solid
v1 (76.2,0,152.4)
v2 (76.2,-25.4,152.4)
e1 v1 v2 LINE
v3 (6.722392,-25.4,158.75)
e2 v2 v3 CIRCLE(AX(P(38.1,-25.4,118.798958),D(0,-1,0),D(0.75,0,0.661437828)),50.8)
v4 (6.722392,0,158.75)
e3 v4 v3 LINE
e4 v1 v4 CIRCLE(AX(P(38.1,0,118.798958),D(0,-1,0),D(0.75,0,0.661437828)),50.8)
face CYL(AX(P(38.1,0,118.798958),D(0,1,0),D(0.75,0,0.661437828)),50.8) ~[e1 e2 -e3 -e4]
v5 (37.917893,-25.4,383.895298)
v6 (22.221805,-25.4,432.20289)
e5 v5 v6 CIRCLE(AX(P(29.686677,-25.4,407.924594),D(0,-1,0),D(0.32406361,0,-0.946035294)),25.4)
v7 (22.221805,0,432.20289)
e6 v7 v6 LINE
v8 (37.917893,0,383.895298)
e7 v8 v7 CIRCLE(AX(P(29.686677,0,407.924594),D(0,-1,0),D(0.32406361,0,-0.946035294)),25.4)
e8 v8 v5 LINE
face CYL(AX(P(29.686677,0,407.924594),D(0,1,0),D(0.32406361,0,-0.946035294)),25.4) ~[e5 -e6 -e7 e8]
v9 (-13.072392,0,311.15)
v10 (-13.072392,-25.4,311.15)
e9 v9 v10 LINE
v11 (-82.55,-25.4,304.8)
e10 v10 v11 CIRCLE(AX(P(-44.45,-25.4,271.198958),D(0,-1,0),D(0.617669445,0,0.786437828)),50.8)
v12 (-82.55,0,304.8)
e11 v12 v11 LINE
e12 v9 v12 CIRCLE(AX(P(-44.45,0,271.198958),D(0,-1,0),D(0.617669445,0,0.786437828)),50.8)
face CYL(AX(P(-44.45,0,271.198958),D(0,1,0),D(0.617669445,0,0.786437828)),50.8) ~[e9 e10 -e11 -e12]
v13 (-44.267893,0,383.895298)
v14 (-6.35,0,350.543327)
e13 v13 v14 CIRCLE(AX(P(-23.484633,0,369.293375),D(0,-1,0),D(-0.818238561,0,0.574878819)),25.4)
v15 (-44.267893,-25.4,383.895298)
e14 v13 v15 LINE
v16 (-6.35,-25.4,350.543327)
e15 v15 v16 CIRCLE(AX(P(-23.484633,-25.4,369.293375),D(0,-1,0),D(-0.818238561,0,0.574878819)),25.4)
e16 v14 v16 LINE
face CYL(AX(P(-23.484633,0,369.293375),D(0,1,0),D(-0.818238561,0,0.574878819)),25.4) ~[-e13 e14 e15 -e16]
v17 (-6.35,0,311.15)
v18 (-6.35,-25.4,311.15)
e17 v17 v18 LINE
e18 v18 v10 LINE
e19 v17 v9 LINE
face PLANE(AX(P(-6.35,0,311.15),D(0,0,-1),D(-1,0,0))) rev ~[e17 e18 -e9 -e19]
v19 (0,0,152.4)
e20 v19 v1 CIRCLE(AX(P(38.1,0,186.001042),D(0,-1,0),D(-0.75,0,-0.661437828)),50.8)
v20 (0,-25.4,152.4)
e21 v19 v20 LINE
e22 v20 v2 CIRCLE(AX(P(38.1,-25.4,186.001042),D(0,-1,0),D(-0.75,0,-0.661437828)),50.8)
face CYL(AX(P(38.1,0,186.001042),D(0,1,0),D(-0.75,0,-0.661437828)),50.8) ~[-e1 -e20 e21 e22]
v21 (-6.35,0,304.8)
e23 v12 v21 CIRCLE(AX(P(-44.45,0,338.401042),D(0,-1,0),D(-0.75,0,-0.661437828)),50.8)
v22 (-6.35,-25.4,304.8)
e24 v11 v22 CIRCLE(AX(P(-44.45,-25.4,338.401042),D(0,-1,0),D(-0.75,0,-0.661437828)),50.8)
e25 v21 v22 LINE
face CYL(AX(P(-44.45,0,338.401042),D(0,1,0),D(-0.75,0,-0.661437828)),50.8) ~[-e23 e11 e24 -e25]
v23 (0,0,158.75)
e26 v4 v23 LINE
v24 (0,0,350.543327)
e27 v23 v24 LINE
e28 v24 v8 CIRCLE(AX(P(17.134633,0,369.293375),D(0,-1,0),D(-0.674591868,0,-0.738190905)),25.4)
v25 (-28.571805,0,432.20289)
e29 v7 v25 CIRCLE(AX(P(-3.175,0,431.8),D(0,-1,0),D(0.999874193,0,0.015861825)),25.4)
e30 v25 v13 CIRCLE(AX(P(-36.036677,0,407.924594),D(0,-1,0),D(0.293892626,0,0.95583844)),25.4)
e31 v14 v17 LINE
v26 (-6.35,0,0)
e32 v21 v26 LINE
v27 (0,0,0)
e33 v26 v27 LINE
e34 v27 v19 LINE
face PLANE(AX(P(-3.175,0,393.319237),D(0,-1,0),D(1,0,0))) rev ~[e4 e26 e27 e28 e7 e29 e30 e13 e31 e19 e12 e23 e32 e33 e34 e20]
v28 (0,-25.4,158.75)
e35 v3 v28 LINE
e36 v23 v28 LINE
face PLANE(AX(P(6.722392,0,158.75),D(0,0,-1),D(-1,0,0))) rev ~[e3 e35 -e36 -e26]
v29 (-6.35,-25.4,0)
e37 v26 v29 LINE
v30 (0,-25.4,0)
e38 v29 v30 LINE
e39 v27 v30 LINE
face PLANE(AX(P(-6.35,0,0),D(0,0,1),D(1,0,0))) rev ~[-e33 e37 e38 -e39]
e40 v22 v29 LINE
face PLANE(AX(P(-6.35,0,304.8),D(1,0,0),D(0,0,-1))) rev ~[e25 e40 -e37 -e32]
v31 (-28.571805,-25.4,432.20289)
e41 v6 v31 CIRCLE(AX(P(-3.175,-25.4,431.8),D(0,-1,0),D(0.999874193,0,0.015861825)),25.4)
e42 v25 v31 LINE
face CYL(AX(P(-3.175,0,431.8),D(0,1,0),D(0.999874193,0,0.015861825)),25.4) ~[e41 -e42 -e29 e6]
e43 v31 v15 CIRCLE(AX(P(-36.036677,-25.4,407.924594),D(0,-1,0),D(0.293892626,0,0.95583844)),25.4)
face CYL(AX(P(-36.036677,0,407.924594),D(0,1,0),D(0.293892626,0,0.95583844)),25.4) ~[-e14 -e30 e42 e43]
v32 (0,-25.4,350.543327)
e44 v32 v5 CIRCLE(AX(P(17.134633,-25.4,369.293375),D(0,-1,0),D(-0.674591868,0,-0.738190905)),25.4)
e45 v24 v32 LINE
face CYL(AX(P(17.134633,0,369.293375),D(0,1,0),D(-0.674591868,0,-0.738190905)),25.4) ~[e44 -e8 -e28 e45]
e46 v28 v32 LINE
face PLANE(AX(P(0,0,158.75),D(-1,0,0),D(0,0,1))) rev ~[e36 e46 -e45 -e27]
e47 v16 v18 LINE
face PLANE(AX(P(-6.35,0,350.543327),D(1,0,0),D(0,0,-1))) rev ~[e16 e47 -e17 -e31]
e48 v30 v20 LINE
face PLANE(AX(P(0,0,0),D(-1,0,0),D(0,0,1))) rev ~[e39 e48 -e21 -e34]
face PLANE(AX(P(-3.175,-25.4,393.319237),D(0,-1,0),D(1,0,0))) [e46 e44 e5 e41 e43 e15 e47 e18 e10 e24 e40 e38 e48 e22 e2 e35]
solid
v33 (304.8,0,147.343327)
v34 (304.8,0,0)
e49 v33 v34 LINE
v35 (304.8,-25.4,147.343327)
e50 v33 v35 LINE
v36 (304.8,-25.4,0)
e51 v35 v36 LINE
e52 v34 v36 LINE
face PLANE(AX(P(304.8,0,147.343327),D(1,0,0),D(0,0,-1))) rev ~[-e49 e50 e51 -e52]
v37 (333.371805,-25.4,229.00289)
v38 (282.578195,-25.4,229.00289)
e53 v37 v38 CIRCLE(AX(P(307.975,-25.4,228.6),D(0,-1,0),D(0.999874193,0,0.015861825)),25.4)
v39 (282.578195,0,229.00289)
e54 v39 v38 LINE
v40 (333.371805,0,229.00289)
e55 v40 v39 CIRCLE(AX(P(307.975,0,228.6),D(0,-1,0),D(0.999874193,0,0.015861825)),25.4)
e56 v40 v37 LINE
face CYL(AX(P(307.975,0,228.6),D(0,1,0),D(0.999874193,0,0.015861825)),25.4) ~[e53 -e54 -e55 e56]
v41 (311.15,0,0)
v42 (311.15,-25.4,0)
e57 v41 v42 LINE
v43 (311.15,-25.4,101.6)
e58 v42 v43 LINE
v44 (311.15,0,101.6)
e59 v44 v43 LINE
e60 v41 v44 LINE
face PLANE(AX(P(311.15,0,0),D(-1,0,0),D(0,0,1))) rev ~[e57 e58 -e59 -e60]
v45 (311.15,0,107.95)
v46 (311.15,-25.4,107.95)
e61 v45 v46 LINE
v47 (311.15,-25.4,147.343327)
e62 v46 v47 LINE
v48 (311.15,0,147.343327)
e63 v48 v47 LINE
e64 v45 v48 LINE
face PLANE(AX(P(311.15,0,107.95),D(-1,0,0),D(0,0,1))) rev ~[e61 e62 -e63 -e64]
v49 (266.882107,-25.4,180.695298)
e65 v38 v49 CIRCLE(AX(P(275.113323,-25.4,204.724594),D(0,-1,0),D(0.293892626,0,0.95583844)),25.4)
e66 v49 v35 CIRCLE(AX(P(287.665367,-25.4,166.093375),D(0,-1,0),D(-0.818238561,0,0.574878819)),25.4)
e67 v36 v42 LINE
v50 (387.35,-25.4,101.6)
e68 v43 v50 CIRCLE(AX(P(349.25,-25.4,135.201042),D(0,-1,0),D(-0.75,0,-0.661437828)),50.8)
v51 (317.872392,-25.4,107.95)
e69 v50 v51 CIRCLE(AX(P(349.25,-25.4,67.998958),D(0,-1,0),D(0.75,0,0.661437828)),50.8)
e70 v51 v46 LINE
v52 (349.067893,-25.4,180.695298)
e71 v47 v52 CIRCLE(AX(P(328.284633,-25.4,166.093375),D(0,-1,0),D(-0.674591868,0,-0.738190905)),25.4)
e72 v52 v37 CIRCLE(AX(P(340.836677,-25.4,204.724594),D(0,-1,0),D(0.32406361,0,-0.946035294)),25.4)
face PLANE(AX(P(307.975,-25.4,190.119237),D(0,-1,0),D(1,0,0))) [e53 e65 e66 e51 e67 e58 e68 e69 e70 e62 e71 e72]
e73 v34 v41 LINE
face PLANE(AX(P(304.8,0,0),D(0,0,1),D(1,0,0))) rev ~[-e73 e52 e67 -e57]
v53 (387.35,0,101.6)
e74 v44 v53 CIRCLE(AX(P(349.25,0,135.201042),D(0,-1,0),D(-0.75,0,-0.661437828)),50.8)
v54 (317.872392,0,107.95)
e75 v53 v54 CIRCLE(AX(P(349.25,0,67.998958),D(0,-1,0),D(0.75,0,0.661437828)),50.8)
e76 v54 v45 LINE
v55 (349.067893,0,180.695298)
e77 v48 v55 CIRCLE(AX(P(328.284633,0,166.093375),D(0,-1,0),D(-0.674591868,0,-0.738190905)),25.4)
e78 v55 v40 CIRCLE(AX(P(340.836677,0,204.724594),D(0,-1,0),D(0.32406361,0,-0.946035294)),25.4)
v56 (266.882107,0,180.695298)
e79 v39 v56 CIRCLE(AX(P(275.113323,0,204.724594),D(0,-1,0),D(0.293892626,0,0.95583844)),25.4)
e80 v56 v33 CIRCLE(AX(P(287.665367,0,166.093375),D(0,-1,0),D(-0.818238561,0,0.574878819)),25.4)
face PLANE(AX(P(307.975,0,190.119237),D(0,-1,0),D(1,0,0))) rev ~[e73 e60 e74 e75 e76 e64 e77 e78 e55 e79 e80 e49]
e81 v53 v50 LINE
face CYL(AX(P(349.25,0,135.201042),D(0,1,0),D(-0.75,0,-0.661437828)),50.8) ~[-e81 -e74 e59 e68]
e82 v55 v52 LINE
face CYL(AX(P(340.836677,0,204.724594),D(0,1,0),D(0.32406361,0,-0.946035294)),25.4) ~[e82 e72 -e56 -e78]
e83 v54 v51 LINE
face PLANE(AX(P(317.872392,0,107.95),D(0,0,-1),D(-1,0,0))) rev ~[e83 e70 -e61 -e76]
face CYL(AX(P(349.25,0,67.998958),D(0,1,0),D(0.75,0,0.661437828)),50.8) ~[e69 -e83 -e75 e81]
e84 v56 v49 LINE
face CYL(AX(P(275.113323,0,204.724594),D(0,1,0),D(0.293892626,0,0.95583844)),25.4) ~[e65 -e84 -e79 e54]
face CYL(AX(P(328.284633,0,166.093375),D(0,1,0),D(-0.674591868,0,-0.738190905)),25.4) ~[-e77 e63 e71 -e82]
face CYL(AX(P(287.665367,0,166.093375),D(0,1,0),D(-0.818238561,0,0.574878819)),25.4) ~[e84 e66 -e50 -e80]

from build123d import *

# Parameters (mm, degrees)
F1_DEPTH = 25.4


with BuildPart() as f1:
    # F0 (on Front) → F1 (new body)
    with BuildSketch(Plane.XZ):
        with BuildLine():
            ThreePointArc((-44.2678929043, 383.8952975035), (-40.260109895, 350.2213176653), (-6.35, 350.5433265189))
            Line((-6.35, 350.5433265189), (-6.35, 359.6170129621))
            ThreePointArc((-6.35, 359.6170129621), (-8.2653665538, 369.2933754965), (-6.35, 378.9697380309))
            ThreePointArc((-6.35, 378.9697380309), (-4.9393657292, 381.8591448881), (-3.175, 384.5471877833))
            ThreePointArc((-3.175, 384.5471877833), (-1.4106342708, 381.8591448881), (0, 378.9697380309))
            ThreePointArc((0, 378.9697380309), (1.9153665538, 369.2933754965), (0, 359.6170129621))
            Line((0, 359.6170129621), (0, 350.5433265189))
            ThreePointArc((0, 350.5433265189), (33.910109895, 350.2213176653), (37.9178929043, 383.8952975035))
            ThreePointArc((37.9178929043, 383.8952975035), (53.8435127289, 415.7736256188), (22.2218045109, 432.2028903499))
            ThreePointArc((22.2218045109, 432.2028903499), (-3.175, 457.2), (-28.5718045109, 432.2028903499))
            ThreePointArc((-28.5718045109, 432.2028903499), (-60.1935127289, 415.7736256188), (-44.2678929043, 383.8952975035))
        make_face()
        with BuildLine():
            ThreePointArc((-15.2534177569, 393.3226719547), (-28.1876455579, 383.7677584478), (-44.2678929043, 383.8952975035))
            ThreePointArc((-44.2678929043, 383.8952975035), (-31.3336651033, 393.4502110104), (-15.2534177569, 393.3226719547))
        make_face(mode=Mode.SUBTRACT)
        with BuildLine():
            ThreePointArc((8.9034177569, 393.3226719547), (24.9836651033, 393.4502110104), (37.9178929043, 383.8952975035))
            ThreePointArc((37.9178929043, 383.8952975035), (21.8376455579, 383.7677584478), (8.9034177569, 393.3226719547))
        make_face(mode=Mode.SUBTRACT)
        with BuildLine():
            ThreePointArc((-10.6398727041, 407.5217036118), (-23.7240316571, 416.8702545918), (-28.5718045109, 432.2028903499))
            ThreePointArc((-28.5718045109, 432.2028903499), (-15.4876455579, 422.8543393699), (-10.6398727041, 407.5217036118))
        make_face(mode=Mode.SUBTRACT)
        with BuildLine():
            ThreePointArc((4.2898727041, 407.5217036118), (9.1376455579, 422.8543393699), (22.2218045109, 432.2028903499))
            ThreePointArc((22.2218045109, 432.2028903499), (17.3740316571, 416.8702545918), (4.2898727041, 407.5217036118))
        make_face(mode=Mode.SUBTRACT)
        with BuildLine():
            Line((-6.35, 304.8), (-6.35, 0))
            Line((-6.35, 0), (0, 0))
            Line((0, 0), (0, 152.4))
            Line((0, 152.4), (0, 158.75))
            Line((0, 158.75), (0, 350.5433265189))
            ThreePointArc((0, 350.5433265189), (-1.6689353248, 352.2174918745), (-3.175, 354.0395632097))
            ThreePointArc((-3.175, 354.0395632097), (-4.6810646752, 352.2174918745), (-6.35, 350.5433265189))
            Line((-6.35, 350.5433265189), (-6.35, 311.15))
            Line((-6.35, 311.15), (-6.35, 304.8))
        make_face()
        with BuildLine():
            ThreePointArc((-82.55, 304.8), (-44.45, 287.6010416505), (-6.35, 304.8))
            ThreePointArc((-6.35, 304.8), (-9.56640613, 308.1282810987), (-13.0723922034, 311.15))
            ThreePointArc((-13.0723922034, 311.15), (-49.0736635079, 321.7881047721), (-82.55, 304.8))
        make_face()
        with BuildLine():
            ThreePointArc((6.7223922034, 158.75), (3.21640613, 155.7282810987), (0, 152.4))
            ThreePointArc((0, 152.4), (38.1, 135.2010416505), (76.2, 152.4))
            ThreePointArc((76.2, 152.4), (42.7236635079, 169.3881047721), (6.7223922034, 158.75))
        make_face()
        with BuildLine():
            ThreePointArc((8.9034177569, 393.3226719547), (21.8376455579, 383.7677584478), (37.9178929043, 383.8952975035))
            ThreePointArc((37.9178929043, 383.8952975035), (24.9836651033, 393.4502110104), (8.9034177569, 393.3226719547))
        make_face()
        with BuildLine():
            ThreePointArc((4.2898727041, 407.5217036118), (17.3740316571, 416.8702545918), (22.2218045109, 432.2028903499))
            ThreePointArc((22.2218045109, 432.2028903499), (9.1376455579, 422.8543393699), (4.2898727041, 407.5217036118))
        make_face()
        with BuildLine():
            ThreePointArc((-10.6398727041, 407.5217036118), (-15.4876455579, 422.8543393699), (-28.5718045109, 432.2028903499))
            ThreePointArc((-28.5718045109, 432.2028903499), (-23.7240316571, 416.8702545918), (-10.6398727041, 407.5217036118))
        make_face()
        with BuildLine():
            ThreePointArc((-15.2534177569, 393.3226719547), (-31.3336651033, 393.4502110104), (-44.2678929043, 383.8952975035))
            ThreePointArc((-44.2678929043, 383.8952975035), (-28.1876455579, 383.7677584478), (-15.2534177569, 393.3226719547))
        make_face()
        with BuildLine():
            Line((-6.35, 378.9697380309), (-6.35, 359.6170129621))
            ThreePointArc((-6.35, 359.6170129621), (-4.9393657292, 356.7276061049), (-3.175, 354.0395632097))
            ThreePointArc((-3.175, 354.0395632097), (-1.4106342708, 356.7276061049), (0, 359.6170129621))
            Line((0, 359.6170129621), (0, 378.9697380309))
            ThreePointArc((0, 378.9697380309), (-1.4106342708, 381.8591448881), (-3.175, 384.5471877833))
            ThreePointArc((-3.175, 384.5471877833), (-4.9393657292, 381.8591448881), (-6.35, 378.9697380309))
        make_face()
        with BuildLine():
            ThreePointArc((-6.35, 378.9697380309), (-8.2653665538, 369.2933754965), (-6.35, 359.6170129621))
            Line((-6.35, 359.6170129621), (-6.35, 378.9697380309))
        make_face()
        with BuildLine():
            Line((0, 378.9697380309), (0, 359.6170129621))
            ThreePointArc((0, 359.6170129621), (1.9153665538, 369.2933754965), (0, 378.9697380309))
        make_face()
        with BuildLine():
            ThreePointArc((-13.0723922034, 311.15), (-9.56640613, 308.1282810987), (-6.35, 304.8))
            Line((-6.35, 304.8), (-6.35, 311.15))
            Line((-6.35, 311.15), (-13.0723922034, 311.15))
        make_face()
        with BuildLine():
            Line((0, 158.75), (0, 152.4))
            ThreePointArc((0, 152.4), (3.21640613, 155.7282810987), (6.7223922034, 158.75))
            Line((6.7223922034, 158.75), (0, 158.75))
        make_face()
        with BuildLine():
            Line((-6.35, 359.6170129621), (-6.35, 350.5433265189))
            ThreePointArc((-6.35, 350.5433265189), (-4.6810646752, 352.2174918745), (-3.175, 354.0395632097))
            ThreePointArc((-3.175, 354.0395632097), (-4.9393657292, 356.7276061049), (-6.35, 359.6170129621))
        make_face()
        with BuildLine():
            ThreePointArc((0, 359.6170129621), (-1.4106342708, 356.7276061049), (-3.175, 354.0395632097))
            ThreePointArc((-3.175, 354.0395632097), (-1.6689353248, 352.2174918745), (0, 350.5433265189))
            Line((0, 350.5433265189), (0, 359.6170129621))
        make_face()
    extrude(amount=F1_DEPTH)


with BuildPart() as f1b:
    # F0 (on Front) → F1, piece 2 (new body)
    with BuildSketch(Plane.XZ):
        with BuildLine():
            ThreePointArc((266.8821070957, 180.6952975035), (270.889890105, 147.0213176653), (304.8, 147.3433265189))
            Line((304.8, 147.3433265189), (304.8, 156.4170129621))
            ThreePointArc((304.8, 156.4170129621), (302.8846334462, 166.0933754965), (304.8, 175.7697380309))
            ThreePointArc((304.8, 175.7697380309), (306.2106342708, 178.6591448881), (307.975, 181.3471877833))
            ThreePointArc((307.975, 181.3471877833), (309.7393657292, 178.6591448881), (311.15, 175.7697380309))
            ThreePointArc((311.15, 175.7697380309), (313.0653665538, 166.0933754965), (311.15, 156.4170129621))
            Line((311.15, 156.4170129621), (311.15, 147.3433265189))
            ThreePointArc((311.15, 147.3433265189), (345.060109895, 147.0213176653), (349.0678929043, 180.6952975035))
            ThreePointArc((349.0678929043, 180.6952975035), (364.9935127289, 212.5736256188), (333.3718045109, 229.0028903499))
            ThreePointArc((333.3718045109, 229.0028903499), (307.975, 254), (282.5781954891, 229.0028903499))
            ThreePointArc((282.5781954891, 229.0028903499), (250.9564872711, 212.5736256188), (266.8821070957, 180.6952975035))
        make_face()
        with BuildLine():
            ThreePointArc((295.8965822431, 190.1226719547), (282.9623544421, 180.5677584478), (266.8821070957, 180.6952975035))
            ThreePointArc((266.8821070957, 180.6952975035), (279.8163348967, 190.2502110104), (295.8965822431, 190.1226719547))
        make_face(mode=Mode.SUBTRACT)
        with BuildLine():
            ThreePointArc((300.5101272959, 204.3217036118), (287.4259683429, 213.6702545918), (282.5781954891, 229.0028903499))
            ThreePointArc((282.5781954891, 229.0028903499), (295.6623544421, 219.6543393699), (300.5101272959, 204.3217036118))
        make_face(mode=Mode.SUBTRACT)
        with BuildLine():
            ThreePointArc((315.4398727041, 204.3217036118), (320.2876455579, 219.6543393699), (333.3718045109, 229.0028903499))
            ThreePointArc((333.3718045109, 229.0028903499), (328.5240316571, 213.6702545918), (315.4398727041, 204.3217036118))
        make_face(mode=Mode.SUBTRACT)
        with BuildLine():
            ThreePointArc((320.0534177569, 190.1226719547), (336.1336651033, 190.2502110104), (349.0678929043, 180.6952975035))
            ThreePointArc((349.0678929043, 180.6952975035), (332.9876455579, 180.5677584478), (320.0534177569, 190.1226719547))
        make_face(mode=Mode.SUBTRACT)
        with BuildLine():
            ThreePointArc((317.8723922034, 107.95), (314.36640613, 104.9282810987), (311.15, 101.6))
            ThreePointArc((311.15, 101.6), (349.25, 84.4010416505), (387.35, 101.6))
            ThreePointArc((387.35, 101.6), (353.8736635079, 118.5881047721), (317.8723922034, 107.95))
        make_face()
        with BuildLine():
            Line((304.8, 147.3433265189), (304.8, 0))
            Line((304.8, 0), (311.15, 0))
            Line((311.15, 0), (311.15, 101.6))
            Line((311.15, 101.6), (311.15, 107.95))
            Line((311.15, 107.95), (311.15, 147.3433265189))
            ThreePointArc((311.15, 147.3433265189), (309.4810646752, 149.0174918745), (307.975, 150.8395632097))
            ThreePointArc((307.975, 150.8395632097), (306.4689353248, 149.0174918745), (304.8, 147.3433265189))
        make_face()
        with BuildLine():
            ThreePointArc((320.0534177569, 190.1226719547), (332.9876455579, 180.5677584478), (349.0678929043, 180.6952975035))
            ThreePointArc((349.0678929043, 180.6952975035), (336.1336651033, 190.2502110104), (320.0534177569, 190.1226719547))
        make_face()
        with BuildLine():
            ThreePointArc((315.4398727041, 204.3217036118), (328.5240316571, 213.6702545918), (333.3718045109, 229.0028903499))
            ThreePointArc((333.3718045109, 229.0028903499), (320.2876455579, 219.6543393699), (315.4398727041, 204.3217036118))
        make_face()
        with BuildLine():
            ThreePointArc((300.5101272959, 204.3217036118), (295.6623544421, 219.6543393699), (282.5781954891, 229.0028903499))
            ThreePointArc((282.5781954891, 229.0028903499), (287.4259683429, 213.6702545918), (300.5101272959, 204.3217036118))
        make_face()
        with BuildLine():
            ThreePointArc((295.8965822431, 190.1226719547), (279.8163348967, 190.2502110104), (266.8821070957, 180.6952975035))
            ThreePointArc((266.8821070957, 180.6952975035), (282.9623544421, 180.5677584478), (295.8965822431, 190.1226719547))
        make_face()
        with BuildLine():
            Line((304.8, 175.7697380309), (304.8, 156.4170129621))
            ThreePointArc((304.8, 156.4170129621), (306.2106342708, 153.5276061049), (307.975, 150.8395632097))
            ThreePointArc((307.975, 150.8395632097), (309.7393657292, 153.5276061049), (311.15, 156.4170129621))
            Line((311.15, 156.4170129621), (311.15, 175.7697380309))
            ThreePointArc((311.15, 175.7697380309), (309.7393657292, 178.6591448881), (307.975, 181.3471877833))
            ThreePointArc((307.975, 181.3471877833), (306.2106342708, 178.6591448881), (304.8, 175.7697380309))
        make_face()
        with BuildLine():
            ThreePointArc((304.8, 175.7697380309), (302.8846334462, 166.0933754965), (304.8, 156.4170129621))
            Line((304.8, 156.4170129621), (304.8, 175.7697380309))
        make_face()
        with BuildLine():
            Line((311.15, 175.7697380309), (311.15, 156.4170129621))
            ThreePointArc((311.15, 156.4170129621), (313.0653665538, 166.0933754965), (311.15, 175.7697380309))
        make_face()
        with BuildLine():
            Line((311.15, 107.95), (311.15, 101.6))
            ThreePointArc((311.15, 101.6), (314.36640613, 104.9282810987), (317.8723922034, 107.95))
            Line((317.8723922034, 107.95), (311.15, 107.95))
        make_face()
        with BuildLine():
            Line((304.8, 156.4170129621), (304.8, 147.3433265189))
            ThreePointArc((304.8, 147.3433265189), (306.4689353248, 149.0174918745), (307.975, 150.8395632097))
            ThreePointArc((307.975, 150.8395632097), (306.2106342708, 153.5276061049), (304.8, 156.4170129621))
        make_face()
        with BuildLine():
            ThreePointArc((311.15, 156.4170129621), (309.7393657292, 153.5276061049), (307.975, 150.8395632097))
            ThreePointArc((307.975, 150.8395632097), (309.4810646752, 149.0174918745), (311.15, 147.3433265189))
            Line((311.15, 147.3433265189), (311.15, 156.4170129621))
        make_face()
    extrude(amount=F1_DEPTH)


solid = Compound([f1.part, f1b.part])
